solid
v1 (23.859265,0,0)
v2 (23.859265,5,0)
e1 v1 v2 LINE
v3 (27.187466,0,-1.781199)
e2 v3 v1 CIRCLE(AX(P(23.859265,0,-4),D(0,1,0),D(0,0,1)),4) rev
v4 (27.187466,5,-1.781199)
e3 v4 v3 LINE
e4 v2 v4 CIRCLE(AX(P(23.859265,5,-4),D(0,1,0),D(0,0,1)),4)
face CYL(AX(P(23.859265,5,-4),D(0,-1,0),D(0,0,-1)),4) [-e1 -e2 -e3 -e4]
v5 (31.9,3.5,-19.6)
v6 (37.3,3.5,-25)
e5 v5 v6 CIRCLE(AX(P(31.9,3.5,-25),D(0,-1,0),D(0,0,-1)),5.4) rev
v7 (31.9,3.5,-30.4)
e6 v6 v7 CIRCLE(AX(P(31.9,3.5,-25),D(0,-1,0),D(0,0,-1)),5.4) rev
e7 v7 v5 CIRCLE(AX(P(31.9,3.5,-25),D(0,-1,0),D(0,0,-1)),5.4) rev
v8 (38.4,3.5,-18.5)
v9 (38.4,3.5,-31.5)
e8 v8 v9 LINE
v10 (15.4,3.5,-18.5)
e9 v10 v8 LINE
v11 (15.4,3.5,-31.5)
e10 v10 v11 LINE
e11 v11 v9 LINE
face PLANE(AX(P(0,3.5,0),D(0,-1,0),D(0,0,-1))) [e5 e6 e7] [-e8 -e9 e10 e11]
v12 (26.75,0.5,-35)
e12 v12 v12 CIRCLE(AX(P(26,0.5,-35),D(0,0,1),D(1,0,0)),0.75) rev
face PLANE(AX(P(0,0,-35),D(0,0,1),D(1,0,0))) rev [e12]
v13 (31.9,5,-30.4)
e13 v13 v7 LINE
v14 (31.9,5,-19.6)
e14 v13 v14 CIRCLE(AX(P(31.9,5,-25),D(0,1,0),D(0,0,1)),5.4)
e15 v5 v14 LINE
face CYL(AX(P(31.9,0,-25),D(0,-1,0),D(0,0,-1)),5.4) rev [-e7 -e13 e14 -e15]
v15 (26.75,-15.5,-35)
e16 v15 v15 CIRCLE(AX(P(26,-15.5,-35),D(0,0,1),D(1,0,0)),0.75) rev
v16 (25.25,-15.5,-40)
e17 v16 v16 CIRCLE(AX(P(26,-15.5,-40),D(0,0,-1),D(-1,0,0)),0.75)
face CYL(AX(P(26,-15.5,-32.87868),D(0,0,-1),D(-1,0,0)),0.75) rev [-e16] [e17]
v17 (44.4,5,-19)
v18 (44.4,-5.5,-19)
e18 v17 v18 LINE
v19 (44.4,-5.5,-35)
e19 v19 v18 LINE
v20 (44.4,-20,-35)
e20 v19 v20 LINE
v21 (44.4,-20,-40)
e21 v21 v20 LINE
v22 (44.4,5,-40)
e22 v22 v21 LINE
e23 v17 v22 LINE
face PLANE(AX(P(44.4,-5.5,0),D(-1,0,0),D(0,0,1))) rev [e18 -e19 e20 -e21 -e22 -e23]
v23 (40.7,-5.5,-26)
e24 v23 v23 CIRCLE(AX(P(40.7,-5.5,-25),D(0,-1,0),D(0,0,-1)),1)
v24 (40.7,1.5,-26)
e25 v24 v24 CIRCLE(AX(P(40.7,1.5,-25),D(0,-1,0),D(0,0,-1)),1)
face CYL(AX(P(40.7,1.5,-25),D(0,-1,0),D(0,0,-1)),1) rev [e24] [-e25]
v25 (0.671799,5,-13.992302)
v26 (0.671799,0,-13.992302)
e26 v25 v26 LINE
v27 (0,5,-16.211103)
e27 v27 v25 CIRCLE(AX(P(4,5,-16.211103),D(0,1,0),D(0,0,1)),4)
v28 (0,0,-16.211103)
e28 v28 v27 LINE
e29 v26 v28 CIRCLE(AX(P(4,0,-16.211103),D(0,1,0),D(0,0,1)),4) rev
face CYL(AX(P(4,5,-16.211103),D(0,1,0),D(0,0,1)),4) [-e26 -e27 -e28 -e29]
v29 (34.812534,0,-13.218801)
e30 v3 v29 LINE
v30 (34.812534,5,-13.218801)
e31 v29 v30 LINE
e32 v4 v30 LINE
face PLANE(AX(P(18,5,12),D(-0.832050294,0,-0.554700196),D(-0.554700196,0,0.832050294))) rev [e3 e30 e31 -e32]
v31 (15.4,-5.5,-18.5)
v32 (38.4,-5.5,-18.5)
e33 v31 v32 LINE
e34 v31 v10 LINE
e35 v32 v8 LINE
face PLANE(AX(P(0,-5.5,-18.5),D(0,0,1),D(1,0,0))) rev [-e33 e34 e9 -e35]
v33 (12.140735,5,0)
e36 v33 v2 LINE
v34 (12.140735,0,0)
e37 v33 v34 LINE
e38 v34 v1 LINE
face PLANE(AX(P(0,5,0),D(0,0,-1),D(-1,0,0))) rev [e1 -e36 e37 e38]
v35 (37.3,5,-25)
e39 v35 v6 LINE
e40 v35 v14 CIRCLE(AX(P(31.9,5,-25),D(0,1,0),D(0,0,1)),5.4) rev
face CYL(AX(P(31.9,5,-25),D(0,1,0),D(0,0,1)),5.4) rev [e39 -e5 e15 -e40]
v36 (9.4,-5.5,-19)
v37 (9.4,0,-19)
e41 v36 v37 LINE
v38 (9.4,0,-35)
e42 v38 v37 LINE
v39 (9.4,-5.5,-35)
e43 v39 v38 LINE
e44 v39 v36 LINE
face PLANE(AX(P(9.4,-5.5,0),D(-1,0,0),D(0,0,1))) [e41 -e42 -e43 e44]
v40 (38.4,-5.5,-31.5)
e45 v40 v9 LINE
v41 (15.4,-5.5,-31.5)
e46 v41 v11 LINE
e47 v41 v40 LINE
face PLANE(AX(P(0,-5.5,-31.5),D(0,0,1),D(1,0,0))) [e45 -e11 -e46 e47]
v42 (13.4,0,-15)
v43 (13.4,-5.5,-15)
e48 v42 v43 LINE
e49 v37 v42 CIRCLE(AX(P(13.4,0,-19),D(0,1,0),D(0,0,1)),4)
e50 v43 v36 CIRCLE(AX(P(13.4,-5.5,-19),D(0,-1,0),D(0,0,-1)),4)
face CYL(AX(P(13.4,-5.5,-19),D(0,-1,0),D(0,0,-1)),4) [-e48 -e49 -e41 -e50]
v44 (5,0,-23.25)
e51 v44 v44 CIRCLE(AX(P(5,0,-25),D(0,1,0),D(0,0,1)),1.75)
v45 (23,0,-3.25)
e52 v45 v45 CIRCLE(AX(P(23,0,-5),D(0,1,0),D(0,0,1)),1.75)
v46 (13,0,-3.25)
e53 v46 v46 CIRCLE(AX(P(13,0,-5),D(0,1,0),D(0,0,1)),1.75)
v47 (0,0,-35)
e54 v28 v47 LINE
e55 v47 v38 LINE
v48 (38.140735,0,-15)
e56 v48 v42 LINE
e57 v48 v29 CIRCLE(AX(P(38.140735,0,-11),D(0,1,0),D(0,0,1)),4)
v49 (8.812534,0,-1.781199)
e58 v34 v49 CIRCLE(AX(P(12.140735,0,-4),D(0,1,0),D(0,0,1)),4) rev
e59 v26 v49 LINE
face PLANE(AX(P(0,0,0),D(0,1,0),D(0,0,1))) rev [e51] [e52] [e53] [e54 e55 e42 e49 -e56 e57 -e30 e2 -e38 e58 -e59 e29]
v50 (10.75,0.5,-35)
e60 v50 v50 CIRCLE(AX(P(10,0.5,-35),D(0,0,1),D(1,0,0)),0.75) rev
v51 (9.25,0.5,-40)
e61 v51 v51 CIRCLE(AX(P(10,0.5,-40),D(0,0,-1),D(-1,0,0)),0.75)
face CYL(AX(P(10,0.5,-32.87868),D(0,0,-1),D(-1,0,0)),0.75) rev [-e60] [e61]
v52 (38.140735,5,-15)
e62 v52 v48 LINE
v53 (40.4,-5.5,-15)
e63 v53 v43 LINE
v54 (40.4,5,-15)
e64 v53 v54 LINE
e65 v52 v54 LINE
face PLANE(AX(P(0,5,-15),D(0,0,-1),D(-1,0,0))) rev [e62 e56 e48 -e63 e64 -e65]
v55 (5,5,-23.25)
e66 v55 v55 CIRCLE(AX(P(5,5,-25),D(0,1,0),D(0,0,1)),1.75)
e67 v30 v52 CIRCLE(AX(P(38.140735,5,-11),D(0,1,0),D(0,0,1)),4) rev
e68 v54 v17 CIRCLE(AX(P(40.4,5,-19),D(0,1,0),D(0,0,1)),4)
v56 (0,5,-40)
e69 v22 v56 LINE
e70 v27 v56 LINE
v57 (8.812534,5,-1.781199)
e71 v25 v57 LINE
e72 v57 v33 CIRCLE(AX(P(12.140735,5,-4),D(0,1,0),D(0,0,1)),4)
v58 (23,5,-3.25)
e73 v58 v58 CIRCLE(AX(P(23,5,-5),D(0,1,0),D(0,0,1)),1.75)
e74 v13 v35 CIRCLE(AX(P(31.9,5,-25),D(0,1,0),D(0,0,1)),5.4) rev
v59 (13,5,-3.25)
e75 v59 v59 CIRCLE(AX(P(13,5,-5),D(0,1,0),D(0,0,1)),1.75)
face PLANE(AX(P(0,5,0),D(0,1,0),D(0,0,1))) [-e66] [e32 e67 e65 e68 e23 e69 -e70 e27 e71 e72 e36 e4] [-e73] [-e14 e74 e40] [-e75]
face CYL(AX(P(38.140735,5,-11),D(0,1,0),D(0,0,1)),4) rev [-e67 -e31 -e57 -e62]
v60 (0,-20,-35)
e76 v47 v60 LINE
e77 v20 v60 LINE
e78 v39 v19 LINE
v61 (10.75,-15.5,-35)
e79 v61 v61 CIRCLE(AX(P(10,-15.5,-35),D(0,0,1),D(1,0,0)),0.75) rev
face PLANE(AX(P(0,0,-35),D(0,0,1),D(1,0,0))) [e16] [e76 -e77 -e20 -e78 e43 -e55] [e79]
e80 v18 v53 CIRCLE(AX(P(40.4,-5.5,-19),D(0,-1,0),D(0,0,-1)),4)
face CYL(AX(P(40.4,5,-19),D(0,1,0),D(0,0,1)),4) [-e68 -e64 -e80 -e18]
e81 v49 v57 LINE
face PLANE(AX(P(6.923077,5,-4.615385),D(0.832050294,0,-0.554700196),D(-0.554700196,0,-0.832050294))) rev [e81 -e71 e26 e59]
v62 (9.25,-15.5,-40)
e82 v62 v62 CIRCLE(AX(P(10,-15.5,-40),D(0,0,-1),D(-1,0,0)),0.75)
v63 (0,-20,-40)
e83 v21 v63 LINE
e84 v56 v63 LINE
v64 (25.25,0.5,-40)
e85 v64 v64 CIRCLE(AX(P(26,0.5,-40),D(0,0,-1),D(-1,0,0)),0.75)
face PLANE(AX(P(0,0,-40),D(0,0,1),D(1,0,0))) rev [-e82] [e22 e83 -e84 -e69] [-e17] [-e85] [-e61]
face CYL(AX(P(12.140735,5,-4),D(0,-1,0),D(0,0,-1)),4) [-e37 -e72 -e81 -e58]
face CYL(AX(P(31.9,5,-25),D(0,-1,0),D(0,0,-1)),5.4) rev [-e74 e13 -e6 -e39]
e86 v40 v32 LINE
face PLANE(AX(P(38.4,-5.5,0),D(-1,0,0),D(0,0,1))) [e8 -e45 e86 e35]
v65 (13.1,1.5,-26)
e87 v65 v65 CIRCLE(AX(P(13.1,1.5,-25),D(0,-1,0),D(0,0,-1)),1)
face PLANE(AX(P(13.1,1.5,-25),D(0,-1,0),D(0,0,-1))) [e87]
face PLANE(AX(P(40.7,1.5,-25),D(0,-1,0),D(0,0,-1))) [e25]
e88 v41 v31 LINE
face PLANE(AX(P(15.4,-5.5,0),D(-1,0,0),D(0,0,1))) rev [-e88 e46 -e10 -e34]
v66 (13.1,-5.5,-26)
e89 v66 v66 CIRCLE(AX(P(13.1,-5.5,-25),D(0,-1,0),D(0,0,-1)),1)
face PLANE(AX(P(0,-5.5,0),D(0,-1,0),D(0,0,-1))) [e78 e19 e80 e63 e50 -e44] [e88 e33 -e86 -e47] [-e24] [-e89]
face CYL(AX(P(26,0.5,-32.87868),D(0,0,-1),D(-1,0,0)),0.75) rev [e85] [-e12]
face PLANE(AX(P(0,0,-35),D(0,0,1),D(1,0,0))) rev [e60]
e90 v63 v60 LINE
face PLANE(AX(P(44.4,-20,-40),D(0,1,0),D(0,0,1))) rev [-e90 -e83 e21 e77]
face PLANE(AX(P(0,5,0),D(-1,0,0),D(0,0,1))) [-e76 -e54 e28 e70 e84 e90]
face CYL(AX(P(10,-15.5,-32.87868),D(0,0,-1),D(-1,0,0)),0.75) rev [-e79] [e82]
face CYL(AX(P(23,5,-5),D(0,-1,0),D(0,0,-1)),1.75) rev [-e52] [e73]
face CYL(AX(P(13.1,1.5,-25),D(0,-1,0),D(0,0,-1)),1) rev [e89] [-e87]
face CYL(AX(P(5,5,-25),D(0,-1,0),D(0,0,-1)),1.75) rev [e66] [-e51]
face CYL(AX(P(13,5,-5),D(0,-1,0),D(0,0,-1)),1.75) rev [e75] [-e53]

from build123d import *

# Parameters (mm, degrees)
SKETCH1_R           = 1.75
SKETCH1_W           = 7.2
SKETCH1_H           = 5.4
BOSS_EXTRUDE1_DEPTH = 5
FILLET5_RADIUS      = 10
FILLET5_LENGTH      = 5
FILLET2_R           = 5.4
FILLET6_R           = 5.4
SKETCH3_W           = 35
SKETCH3_H           = 20
SKETCH3_W_2         = 23
SKETCH3_H_2         = 13
BOSS_EXTRUDE4_DEPTH = 5.5
SKETCH5_W           = 23
SKETCH5_H           = 13
CUT_EXTRUDE1_DEPTH  = 3.5
CUT_EXTRUDE2_DEPTH  = 76.201396264
SKETCH9_R           = 1
CUT_EXTRUDE4_DEPTH  = 7
SKETCH10_W          = 36
SKETCH10_H          = 5
CUT_EXTRUDE5_DEPTH  = 10
FILLET10_R          = 4
SKETCH11_W          = 44.4
SKETCH11_H          = 25
BOSS_EXTRUDE5_DEPTH = 5
SKETCH12_W          = 1.180339887
SKETCH12_H          = 5
BOSS_EXTRUDE6_DEPTH = 44.4
SKETCH13_R          = 0.75
CUT_EXTRUDE6_DEPTH  = 5


with BuildPart() as part:
    # Sketch1 → Boss-Extrude1 (new body)
    # profile 1 of 4: a face of its own
    with BuildSketch(Plane(origin=(0, 0, 0), x_dir=(1, 0, 0), z_dir=(0, 1, 0))):
        with BuildLine():
            Line((3.25, 25), (0, 25))
            Line((0, 25), (0, 15))
            Line((0, 15), (10, 0))
            Line((10, 0), (26, 0))
            Line((26, 0), (36, 15))
            Line((36, 15), (60, 15))
            Line((60, 15), (60, 25))
            Line((60, 25), (44.5, 25))
            Line((44.5, 25), (44.5, 19.6))
            Line((44.5, 19.6), (37.3, 19.6))
            Line((37.3, 19.6), (26.5, 19.6))
            Line((26.5, 19.6), (26.5, 25))
            Line((26.5, 25), (6.75, 25))
            ThreePointArc((6.75, 25), (5, 23.25), (3.25, 25))
        make_face()
        with Locations(Location((13, 5, 0), (0, 0, 270))):
            Circle(SKETCH1_R, mode=Mode.SUBTRACT)
        with Locations(Location((23, 5, 0), (0, 0, 270))):
            Circle(SKETCH1_R, mode=Mode.SUBTRACT)
    # profile 2 of 4: a face of its own
    with BuildSketch(Plane(origin=(0, 0, 0), x_dir=(1, 0, 0), z_dir=(0, 1, 0))):
        with BuildLine():
            Line((10, 45), (0, 33.819660113))
            Line((0, 33.819660113), (0, 25))
            Line((0, 25), (3.25, 25))
            ThreePointArc((3.25, 25), (5, 26.75), (6.75, 25))
            Line((6.75, 25), (26.5, 25))
            Line((26.5, 25), (26.5, 30.4))
            Line((26.5, 30.4), (37.3, 30.4))
            Line((37.3, 30.4), (44.5, 30.4))
            Line((44.5, 30.4), (44.5, 25))
            Line((44.5, 25), (60, 25))
            Line((60, 25), (60, 35))
            Line((60, 35), (36, 35))
            Line((36, 35), (26, 45))
            Line((26, 45), (10, 45))
        make_face()
    # profile 3 of 4: a face of its own
    with BuildSketch(Plane(origin=(0, 0, 0), x_dir=(1, 0, 0), z_dir=(0, 1, 0))):
        with Locations((40.9, 27.7)):
            Rectangle(SKETCH1_W, SKETCH1_H)
    # profile 4 of 4: a face of its own
    with BuildSketch(Plane(origin=(0, 0, 0), x_dir=(1, 0, 0), z_dir=(0, 1, 0))):
        with Locations((40.9, 22.3)):
            Rectangle(SKETCH1_W, SKETCH1_H)
    extrude(amount=BOSS_EXTRUDE1_DEPTH)

    # Fillet5: full round fillet: the end face becomes a half cylinder, R = half its width
    fillet5_face = Plane((60, 2.5, -25), x_dir=(0, -1, 0), z_dir=(1, 0, 0))  # on the end face: x along it, z out of the body
    fillet5_slab = fillet5_face.offset(-FILLET5_RADIUS / 2) * Box(FILLET5_LENGTH, 2 * FILLET5_RADIUS, FILLET5_RADIUS, mode=Mode.PRIVATE)  # the body's end, R deep
    fillet5_round = Plane((50, 2.5, -25), x_dir=(1, 0, 0), z_dir=(0, -1, 0)) * Cylinder(FILLET5_RADIUS, FILLET5_LENGTH, mode=Mode.PRIVATE)  # its axis R under the face
    add(fillet5_slab - fillet5_round, mode=Mode.SUBTRACT)

    # Fillet2
    fillet2_edges = [part.edges().sort_by_distance(p)[0] for p in [
        (26.5, 2.5, -30.4),
        (26.5, 2.5, -19.6),
    ]]
    fillet(fillet2_edges, radius=FILLET2_R - 0.0001)  # a hair under: the kernel refuses the full size

    # Fillet6
    fillet6_edges = [part.edges().sort_by_distance(p)[0] for p in [
        (37.3, 2.5, -19.6),
        (37.3, 2.5, -30.4),
    ]]
    fillet(fillet6_edges, radius=FILLET6_R - 0.0001)  # a hair under: the kernel refuses the full size

    # Sketch3 → Boss-Extrude4 (add)
    with BuildSketch(Plane.XZ):
        with Locations((26.9, -25)):
            Rectangle(SKETCH3_W, SKETCH3_H)
        with Locations((26.9, -25)):
            Rectangle(SKETCH3_W_2, SKETCH3_H_2, mode=Mode.SUBTRACT)
    extrude(amount=BOSS_EXTRUDE4_DEPTH)

    # Sketch5 → Cut-Extrude1 (cut)
    with BuildSketch(Plane.XZ):
        with Locations((26.9, -25)):
            Rectangle(SKETCH5_W, SKETCH5_H)
    extrude(amount=-CUT_EXTRUDE1_DEPTH, mode=Mode.SUBTRACT)

    # Sketch6 → Cut-Extrude2 (cut, through all)
    with BuildSketch(Plane.XZ):
        with BuildLine():
            Line((44.4, -15), (44.4, -35))
            Line((44.4, -35), (50, -35))
            ThreePointArc((50, -35), (60, -25), (50, -15))
            Line((50, -15), (44.4, -15))
        make_face()
    extrude(amount=-CUT_EXTRUDE2_DEPTH, mode=Mode.SUBTRACT)

    # Sketch9 → Cut-Extrude4 (cut)
    with BuildSketch(Plane.XZ.offset(5.5)):
        with Locations(Location((13.1, -25, 0), (0, 0, 270))):
            Circle(SKETCH9_R)
        with Locations(Location((40.7, -25, 0), (0, 0, 270))):
            Circle(SKETCH9_R)
    extrude(amount=-CUT_EXTRUDE4_DEPTH, mode=Mode.SUBTRACT)

    # Sketch10 → Cut-Extrude5 (cut)
    with BuildSketch(Plane(origin=(0, 0, -45), x_dir=(-1, 0, 0), z_dir=(0, 0, -1))):
        with Locations((-18, 2.5)):
            Rectangle(SKETCH10_W, SKETCH10_H)
    extrude(amount=-CUT_EXTRUDE5_DEPTH, mode=Mode.SUBTRACT)

    # Fillet10
    fillet10_edges = [part.edges().sort_by_distance(p)[0] for p in [
        (36, 2.5, -15),
        (26, 2.5, 0),
        (10, 2.5, 0),
        (0, 2.5, -15),
        (44.4, -0.25, -15),
        (9.4, -2.75, -15),
    ]]
    fillet(fillet10_edges, radius=FILLET10_R)

    # Sketch11 → Boss-Extrude5 (add)
    with BuildSketch(Plane(origin=(0, 0, -35), x_dir=(-1, 0, 0), z_dir=(0, 0, -1))):
        with Locations((-22.2, -7.5)):
            Rectangle(SKETCH11_W, SKETCH11_H)
    extrude(amount=BOSS_EXTRUDE5_DEPTH)

    # Sketch12 → Boss-Extrude6 (add)
    with BuildSketch(Plane.ZY):
        with Locations((-34.409830056, 2.5)):
            Rectangle(SKETCH12_W, SKETCH12_H)
    extrude(amount=-BOSS_EXTRUDE6_DEPTH)

    # Sketch13 → Cut-Extrude6 (cut)
    with BuildSketch(Plane(origin=(0, 0, -40), x_dir=(-1, 0, 0), z_dir=(0, 0, -1))):
        with Locations((-26, 0.5)):
            Circle(SKETCH13_R)
        with Locations((-10, 0.5)):
            Circle(SKETCH13_R)
        with Locations((-10, -15.5)):
            Circle(SKETCH13_R)
        with Locations((-26, -15.5)):
            Circle(SKETCH13_R)
    extrude(amount=-CUT_EXTRUDE6_DEPTH, mode=Mode.SUBTRACT)


solid = part.part
